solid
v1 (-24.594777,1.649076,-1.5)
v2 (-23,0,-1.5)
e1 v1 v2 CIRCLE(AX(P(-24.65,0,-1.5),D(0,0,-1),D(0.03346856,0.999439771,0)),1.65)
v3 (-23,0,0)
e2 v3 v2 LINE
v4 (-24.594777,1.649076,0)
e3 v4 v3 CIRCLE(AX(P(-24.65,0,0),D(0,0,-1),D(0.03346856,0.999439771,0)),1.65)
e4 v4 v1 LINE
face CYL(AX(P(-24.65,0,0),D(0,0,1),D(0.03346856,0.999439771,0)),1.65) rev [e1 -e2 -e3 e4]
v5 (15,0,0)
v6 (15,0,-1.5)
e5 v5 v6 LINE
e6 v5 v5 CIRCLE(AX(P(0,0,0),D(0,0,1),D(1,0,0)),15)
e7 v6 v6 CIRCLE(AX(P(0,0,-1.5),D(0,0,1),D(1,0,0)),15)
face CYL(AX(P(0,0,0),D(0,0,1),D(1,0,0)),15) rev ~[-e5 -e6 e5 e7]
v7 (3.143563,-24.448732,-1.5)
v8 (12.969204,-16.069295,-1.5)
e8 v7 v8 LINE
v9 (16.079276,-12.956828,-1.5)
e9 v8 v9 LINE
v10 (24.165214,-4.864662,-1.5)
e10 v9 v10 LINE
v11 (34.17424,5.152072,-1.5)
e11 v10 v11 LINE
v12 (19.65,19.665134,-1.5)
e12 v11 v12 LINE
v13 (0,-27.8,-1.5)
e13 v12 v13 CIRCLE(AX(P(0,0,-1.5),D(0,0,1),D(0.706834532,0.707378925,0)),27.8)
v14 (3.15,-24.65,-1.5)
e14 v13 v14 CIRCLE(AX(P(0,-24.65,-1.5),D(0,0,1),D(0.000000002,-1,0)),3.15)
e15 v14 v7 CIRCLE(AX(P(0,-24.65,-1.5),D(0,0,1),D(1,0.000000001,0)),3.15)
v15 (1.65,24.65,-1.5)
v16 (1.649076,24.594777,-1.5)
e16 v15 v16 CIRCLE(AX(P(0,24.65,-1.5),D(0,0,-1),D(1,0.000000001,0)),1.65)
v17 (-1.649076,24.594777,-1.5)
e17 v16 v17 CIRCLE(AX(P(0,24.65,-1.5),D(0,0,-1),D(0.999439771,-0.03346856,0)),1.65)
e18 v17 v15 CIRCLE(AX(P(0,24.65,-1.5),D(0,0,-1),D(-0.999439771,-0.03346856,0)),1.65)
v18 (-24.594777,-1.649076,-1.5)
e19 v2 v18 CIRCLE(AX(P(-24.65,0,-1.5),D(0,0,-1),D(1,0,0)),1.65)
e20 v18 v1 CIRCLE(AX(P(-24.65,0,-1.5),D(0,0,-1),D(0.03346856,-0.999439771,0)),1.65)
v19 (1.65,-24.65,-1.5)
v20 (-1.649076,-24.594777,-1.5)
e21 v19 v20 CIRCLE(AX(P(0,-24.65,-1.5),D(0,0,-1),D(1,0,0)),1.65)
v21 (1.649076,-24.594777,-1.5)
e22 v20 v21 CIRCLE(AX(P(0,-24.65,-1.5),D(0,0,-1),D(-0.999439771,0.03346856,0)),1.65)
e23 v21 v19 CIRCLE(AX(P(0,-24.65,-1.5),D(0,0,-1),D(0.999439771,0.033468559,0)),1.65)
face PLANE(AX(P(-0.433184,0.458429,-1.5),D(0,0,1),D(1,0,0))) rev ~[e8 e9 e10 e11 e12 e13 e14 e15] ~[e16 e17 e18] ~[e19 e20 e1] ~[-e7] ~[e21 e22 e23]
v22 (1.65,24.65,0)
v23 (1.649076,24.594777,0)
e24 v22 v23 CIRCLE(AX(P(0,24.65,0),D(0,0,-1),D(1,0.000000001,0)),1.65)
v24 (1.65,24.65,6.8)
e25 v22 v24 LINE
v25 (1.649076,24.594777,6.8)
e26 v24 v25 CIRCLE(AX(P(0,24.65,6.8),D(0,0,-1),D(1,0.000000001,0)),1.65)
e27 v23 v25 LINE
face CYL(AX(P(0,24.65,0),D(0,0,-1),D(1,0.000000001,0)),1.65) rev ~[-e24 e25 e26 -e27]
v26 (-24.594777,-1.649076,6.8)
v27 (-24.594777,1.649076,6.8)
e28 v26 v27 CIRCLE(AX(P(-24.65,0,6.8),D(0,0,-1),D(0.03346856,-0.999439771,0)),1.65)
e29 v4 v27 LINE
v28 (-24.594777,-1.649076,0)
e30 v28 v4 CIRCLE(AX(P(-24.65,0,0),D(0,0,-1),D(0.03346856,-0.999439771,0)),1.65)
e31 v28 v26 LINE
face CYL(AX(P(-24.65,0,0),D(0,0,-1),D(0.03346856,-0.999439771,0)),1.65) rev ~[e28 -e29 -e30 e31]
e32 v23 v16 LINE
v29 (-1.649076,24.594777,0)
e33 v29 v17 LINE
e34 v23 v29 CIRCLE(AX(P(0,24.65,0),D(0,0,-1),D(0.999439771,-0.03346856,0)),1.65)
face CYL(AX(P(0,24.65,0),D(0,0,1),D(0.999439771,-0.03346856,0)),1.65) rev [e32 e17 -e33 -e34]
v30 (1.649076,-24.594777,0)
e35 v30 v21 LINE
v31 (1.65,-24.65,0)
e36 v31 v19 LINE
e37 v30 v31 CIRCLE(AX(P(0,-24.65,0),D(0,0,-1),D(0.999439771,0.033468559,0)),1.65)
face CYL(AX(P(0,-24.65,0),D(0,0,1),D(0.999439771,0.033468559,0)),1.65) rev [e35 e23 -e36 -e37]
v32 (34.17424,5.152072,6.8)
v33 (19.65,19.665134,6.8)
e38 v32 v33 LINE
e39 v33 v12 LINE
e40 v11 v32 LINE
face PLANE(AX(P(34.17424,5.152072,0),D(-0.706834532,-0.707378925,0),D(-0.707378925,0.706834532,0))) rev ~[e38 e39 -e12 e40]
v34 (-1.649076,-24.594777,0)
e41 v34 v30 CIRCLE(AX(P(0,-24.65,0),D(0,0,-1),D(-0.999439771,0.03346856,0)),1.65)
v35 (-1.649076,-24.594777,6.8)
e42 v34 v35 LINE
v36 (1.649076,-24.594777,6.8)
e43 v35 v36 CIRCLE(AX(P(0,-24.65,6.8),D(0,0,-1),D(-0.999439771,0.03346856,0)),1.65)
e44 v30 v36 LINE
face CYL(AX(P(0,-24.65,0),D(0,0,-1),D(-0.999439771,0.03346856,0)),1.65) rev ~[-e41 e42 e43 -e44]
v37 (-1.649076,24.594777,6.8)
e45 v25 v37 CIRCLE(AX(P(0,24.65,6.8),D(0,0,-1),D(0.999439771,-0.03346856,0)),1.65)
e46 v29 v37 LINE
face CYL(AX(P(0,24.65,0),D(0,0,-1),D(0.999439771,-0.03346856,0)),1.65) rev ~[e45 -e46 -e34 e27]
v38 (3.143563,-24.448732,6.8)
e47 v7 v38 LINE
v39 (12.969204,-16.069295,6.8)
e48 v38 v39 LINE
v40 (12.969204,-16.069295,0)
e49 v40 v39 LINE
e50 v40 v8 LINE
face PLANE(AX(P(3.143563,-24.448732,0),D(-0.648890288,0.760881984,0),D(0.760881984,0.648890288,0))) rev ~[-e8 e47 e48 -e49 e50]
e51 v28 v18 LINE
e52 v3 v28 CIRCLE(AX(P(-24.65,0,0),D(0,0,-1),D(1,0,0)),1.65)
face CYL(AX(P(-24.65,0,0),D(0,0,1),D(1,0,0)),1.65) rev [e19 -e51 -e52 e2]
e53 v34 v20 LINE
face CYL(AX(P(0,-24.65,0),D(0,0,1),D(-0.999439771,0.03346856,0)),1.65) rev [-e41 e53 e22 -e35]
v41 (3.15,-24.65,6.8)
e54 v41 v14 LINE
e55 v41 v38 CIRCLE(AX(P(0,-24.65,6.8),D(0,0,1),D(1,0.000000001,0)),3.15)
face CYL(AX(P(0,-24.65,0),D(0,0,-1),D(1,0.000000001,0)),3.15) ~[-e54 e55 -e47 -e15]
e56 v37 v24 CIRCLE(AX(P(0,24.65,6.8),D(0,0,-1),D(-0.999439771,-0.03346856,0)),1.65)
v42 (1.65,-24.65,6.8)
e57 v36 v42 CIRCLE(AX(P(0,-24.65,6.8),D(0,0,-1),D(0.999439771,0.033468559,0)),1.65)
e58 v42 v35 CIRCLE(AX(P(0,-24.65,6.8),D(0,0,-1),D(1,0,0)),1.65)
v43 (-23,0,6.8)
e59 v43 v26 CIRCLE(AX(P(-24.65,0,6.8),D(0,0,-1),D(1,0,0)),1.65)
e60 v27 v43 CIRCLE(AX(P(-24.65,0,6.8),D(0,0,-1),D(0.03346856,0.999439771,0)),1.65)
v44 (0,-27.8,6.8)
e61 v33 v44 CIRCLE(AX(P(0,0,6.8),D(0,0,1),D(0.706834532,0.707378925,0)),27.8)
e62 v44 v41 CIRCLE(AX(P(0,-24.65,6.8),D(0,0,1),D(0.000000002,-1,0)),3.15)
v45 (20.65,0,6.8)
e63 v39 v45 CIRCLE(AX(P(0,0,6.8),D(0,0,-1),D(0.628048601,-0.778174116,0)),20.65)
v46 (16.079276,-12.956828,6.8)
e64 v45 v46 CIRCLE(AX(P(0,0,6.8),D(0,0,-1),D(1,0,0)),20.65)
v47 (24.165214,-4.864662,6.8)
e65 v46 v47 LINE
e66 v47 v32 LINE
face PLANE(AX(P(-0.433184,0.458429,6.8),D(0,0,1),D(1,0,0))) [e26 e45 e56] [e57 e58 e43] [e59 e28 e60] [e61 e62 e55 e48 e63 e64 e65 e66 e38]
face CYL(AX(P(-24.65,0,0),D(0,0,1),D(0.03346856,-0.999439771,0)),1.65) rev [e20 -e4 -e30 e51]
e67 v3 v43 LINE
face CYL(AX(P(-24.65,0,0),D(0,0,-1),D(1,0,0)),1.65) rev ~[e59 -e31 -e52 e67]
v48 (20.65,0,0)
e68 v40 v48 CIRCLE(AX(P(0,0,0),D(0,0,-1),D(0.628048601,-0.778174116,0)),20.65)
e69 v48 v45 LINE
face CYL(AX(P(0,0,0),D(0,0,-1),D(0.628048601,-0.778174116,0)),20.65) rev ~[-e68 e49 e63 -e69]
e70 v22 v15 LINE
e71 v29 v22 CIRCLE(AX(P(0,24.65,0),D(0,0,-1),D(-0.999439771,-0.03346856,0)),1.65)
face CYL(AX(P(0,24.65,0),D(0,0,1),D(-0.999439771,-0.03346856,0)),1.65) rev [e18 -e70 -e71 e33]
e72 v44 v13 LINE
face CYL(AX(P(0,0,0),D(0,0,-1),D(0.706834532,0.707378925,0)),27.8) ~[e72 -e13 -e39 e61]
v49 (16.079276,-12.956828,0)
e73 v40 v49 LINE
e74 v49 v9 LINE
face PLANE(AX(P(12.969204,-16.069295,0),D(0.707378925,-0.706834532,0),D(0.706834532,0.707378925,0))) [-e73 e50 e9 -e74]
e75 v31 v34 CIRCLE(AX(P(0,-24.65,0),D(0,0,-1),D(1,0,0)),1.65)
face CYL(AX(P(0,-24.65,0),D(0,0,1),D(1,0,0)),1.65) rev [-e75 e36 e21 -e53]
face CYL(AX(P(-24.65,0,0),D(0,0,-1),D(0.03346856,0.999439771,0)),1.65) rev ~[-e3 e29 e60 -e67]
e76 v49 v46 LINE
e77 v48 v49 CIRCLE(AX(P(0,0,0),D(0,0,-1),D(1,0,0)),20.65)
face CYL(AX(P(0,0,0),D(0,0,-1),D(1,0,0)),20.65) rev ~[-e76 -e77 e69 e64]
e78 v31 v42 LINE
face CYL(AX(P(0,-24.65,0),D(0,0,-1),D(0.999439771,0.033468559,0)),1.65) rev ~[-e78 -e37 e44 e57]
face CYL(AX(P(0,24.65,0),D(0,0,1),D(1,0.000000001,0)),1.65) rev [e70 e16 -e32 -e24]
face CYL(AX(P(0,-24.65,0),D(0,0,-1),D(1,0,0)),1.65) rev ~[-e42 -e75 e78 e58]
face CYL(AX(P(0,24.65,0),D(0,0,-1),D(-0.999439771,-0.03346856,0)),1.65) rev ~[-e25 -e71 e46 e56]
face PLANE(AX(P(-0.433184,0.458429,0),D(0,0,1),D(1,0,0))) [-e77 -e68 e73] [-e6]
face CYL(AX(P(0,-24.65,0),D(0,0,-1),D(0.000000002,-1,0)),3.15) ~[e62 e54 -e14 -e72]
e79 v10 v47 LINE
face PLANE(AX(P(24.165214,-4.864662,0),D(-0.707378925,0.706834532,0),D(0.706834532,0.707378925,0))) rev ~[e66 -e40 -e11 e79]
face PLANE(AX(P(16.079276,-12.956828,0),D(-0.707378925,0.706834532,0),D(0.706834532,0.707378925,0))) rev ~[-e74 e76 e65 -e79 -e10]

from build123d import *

# Parameters (mm, degrees)
F0_R     = 15
F1_DEPTH = 1.5
F2_DEPTH = 6.8


with BuildPart() as f1:
    # F0 (on Top) → F1 (new body)
    with BuildSketch(Plane.XY):
        with BuildLine():
            ThreePointArc((24.1652138662, -4.8646622494), (24.5285040494, -2.4443790825), (24.65, 0))
            ThreePointArc((24.65, 0), (18.0037803541, 16.8370541652), (1.6490756219, 24.5947768763))
            ThreePointArc((1.6490756219, 24.5947768763), (0, 23), (-1.6490756219, 24.5947768763))
            ThreePointArc((-1.6490756219, 24.5947768763), (-17.4301821562, 17.4301821562), (-24.5947768763, 1.6490756219))
            ThreePointArc((-24.5947768763, 1.6490756219), (-23.4639101733, 1.1470357113), (-23, 0))
            ThreePointArc((-23, 0), (-23.4639101733, -1.1470357113), (-24.5947768763, -1.6490756219))
            ThreePointArc((-24.5947768763, -1.6490756219), (-17.9529932576, -16.8911969112), (-3.1435634706, -24.4487322515))
            ThreePointArc((-3.1435634706, -24.4487322515), (0, -21.5), (3.1435634706, -24.4487322515))
            Line((3.1435634706, -24.4487322515), (12.969203616, -16.0692954907))
            ThreePointArc((12.969203616, -16.0692954907), (-18.6311104697, 8.9052918349), (20.65, 0))
            ThreePointArc((20.65, 0), (19.4738226895, -6.8696964896), (16.0792755585, -12.9568282197))
            Line((16.0792755585, -12.9568282197), (24.1652138662, -4.8646622494))
        make_face()
        with BuildLine():
            ThreePointArc((1.6490756219, 24.5947768763), (18.0037803541, 16.8370541652), (24.65, 0))
            ThreePointArc((24.65, 0), (24.5285040494, -2.4443790825), (24.1652138662, -4.8646622494))
            Line((24.1652138662, -4.8646622494), (27.771636901, -1.2554616043))
            ThreePointArc((27.771636901, -1.2554616043), (27.7929083207, -0.6278909749), (27.8, 0))
            ThreePointArc((27.8, 0), (25.6818028962, 10.6435426433), (19.65, 19.6651341211))
            ThreePointArc((19.65, 19.6651341211), (-25.6858981613, 10.6336557988), (7.1e-09, -27.8))
            ThreePointArc((7.1e-09, -27.8), (-2.2974435124, -26.8050529709), (-3.1435634706, -24.4487322515))
            ThreePointArc((-3.1435634706, -24.4487322515), (-17.9529932576, -16.8911969112), (-24.5947768763, -1.6490756219))
            ThreePointArc((-24.5947768763, -1.6490756219), (-26.3, 0), (-24.5947768763, 1.6490756219))
            ThreePointArc((-24.5947768763, 1.6490756219), (-17.4301821562, 17.4301821562), (-1.6490756219, 24.5947768763))
            ThreePointArc((-1.6490756219, 24.5947768763), (-0.0276154299, 26.2997688893), (1.65, 24.65))
            ThreePointArc((1.65, 24.65), (1.6497688893, 24.6223845701), (1.6490756219, 24.5947768763))
        make_face()
        with BuildLine():
            ThreePointArc((3.15, -24.65), (3.1483904564, -24.549314679), (3.1435634706, -24.4487322515))
            ThreePointArc((3.1435634706, -24.4487322515), (2.3974318813, -24.5331371898), (1.6490756219, -24.5947768763))
            ThreePointArc((1.6490756219, -24.5947768763), (1.6497688893, -24.6223845701), (1.65, -24.65))
            ThreePointArc((1.65, -24.65), (-0.0276154299, -26.2997688893), (-1.6490756219, -24.5947768763))
            ThreePointArc((-1.6490756219, -24.5947768763), (-2.3974318813, -24.5331371898), (-3.1435634706, -24.4487322515))
            ThreePointArc((-3.1435634706, -24.4487322515), (-2.2974435124, -26.8050529709), (7.1e-09, -27.8))
            ThreePointArc((7.1e-09, -27.8), (2.2273863633, -26.8773863582), (3.15, -24.65))
        make_face()
        with BuildLine():
            ThreePointArc((1.6490756219, -24.5947768763), (2.3974318813, -24.5331371898), (3.1435634706, -24.4487322515))
            ThreePointArc((3.1435634706, -24.4487322515), (0, -21.5), (-3.1435634706, -24.4487322515))
            ThreePointArc((-3.1435634706, -24.4487322515), (-2.3974318813, -24.5331371898), (-1.6490756219, -24.5947768763))
            ThreePointArc((-1.6490756219, -24.5947768763), (0, -23), (1.6490756219, -24.5947768763))
        make_face()
        with BuildLine():
            Line((12.969203616, -16.0692954907), (16.0792755585, -12.9568282197))
            ThreePointArc((16.0792755585, -12.9568282197), (19.4738226895, -6.8696964896), (20.65, 0))
            ThreePointArc((20.65, 0), (-18.6311104697, 8.9052918349), (12.969203616, -16.0692954907))
        make_face()
        Circle(F0_R, mode=Mode.SUBTRACT)
        with BuildLine():
            ThreePointArc((27.8, 0), (27.7929083207, -0.6278909749), (27.771636901, -1.2554616043))
            Line((27.771636901, -1.2554616043), (34.1742395873, 5.1520722659))
            Line((34.1742395873, 5.1520722659), (19.65, 19.6651341211))
            ThreePointArc((19.65, 19.6651341211), (25.6818028962, 10.6435426433), (27.8, 0))
        make_face()
    extrude(amount=-F1_DEPTH)

    # F0 (on Top) → F2 (join)
    with BuildSketch(Plane.XY):
        with BuildLine():
            ThreePointArc((24.1652138662, -4.8646622494), (24.5285040494, -2.4443790825), (24.65, 0))
            ThreePointArc((24.65, 0), (18.0037803541, 16.8370541652), (1.6490756219, 24.5947768763))
            ThreePointArc((1.6490756219, 24.5947768763), (0, 23), (-1.6490756219, 24.5947768763))
            ThreePointArc((-1.6490756219, 24.5947768763), (-17.4301821562, 17.4301821562), (-24.5947768763, 1.6490756219))
            ThreePointArc((-24.5947768763, 1.6490756219), (-23.4639101733, 1.1470357113), (-23, 0))
            ThreePointArc((-23, 0), (-23.4639101733, -1.1470357113), (-24.5947768763, -1.6490756219))
            ThreePointArc((-24.5947768763, -1.6490756219), (-17.9529932576, -16.8911969112), (-3.1435634706, -24.4487322515))
            ThreePointArc((-3.1435634706, -24.4487322515), (0, -21.5), (3.1435634706, -24.4487322515))
            Line((3.1435634706, -24.4487322515), (12.969203616, -16.0692954907))
            ThreePointArc((12.969203616, -16.0692954907), (-18.6311104697, 8.9052918349), (20.65, 0))
            ThreePointArc((20.65, 0), (19.4738226895, -6.8696964896), (16.0792755585, -12.9568282197))
            Line((16.0792755585, -12.9568282197), (24.1652138662, -4.8646622494))
        make_face()
        with BuildLine():
            ThreePointArc((1.6490756219, 24.5947768763), (18.0037803541, 16.8370541652), (24.65, 0))
            ThreePointArc((24.65, 0), (24.5285040494, -2.4443790825), (24.1652138662, -4.8646622494))
            Line((24.1652138662, -4.8646622494), (27.771636901, -1.2554616043))
            ThreePointArc((27.771636901, -1.2554616043), (27.7929083207, -0.6278909749), (27.8, 0))
            ThreePointArc((27.8, 0), (25.6818028962, 10.6435426433), (19.65, 19.6651341211))
            ThreePointArc((19.65, 19.6651341211), (-25.6858981613, 10.6336557988), (7.1e-09, -27.8))
            ThreePointArc((7.1e-09, -27.8), (-2.2974435124, -26.8050529709), (-3.1435634706, -24.4487322515))
            ThreePointArc((-3.1435634706, -24.4487322515), (-17.9529932576, -16.8911969112), (-24.5947768763, -1.6490756219))
            ThreePointArc((-24.5947768763, -1.6490756219), (-26.3, 0), (-24.5947768763, 1.6490756219))
            ThreePointArc((-24.5947768763, 1.6490756219), (-17.4301821562, 17.4301821562), (-1.6490756219, 24.5947768763))
            ThreePointArc((-1.6490756219, 24.5947768763), (-0.0276154299, 26.2997688893), (1.65, 24.65))
            ThreePointArc((1.65, 24.65), (1.6497688893, 24.6223845701), (1.6490756219, 24.5947768763))
        make_face()
        with BuildLine():
            ThreePointArc((3.15, -24.65), (3.1483904564, -24.549314679), (3.1435634706, -24.4487322515))
            ThreePointArc((3.1435634706, -24.4487322515), (2.3974318813, -24.5331371898), (1.6490756219, -24.5947768763))
            ThreePointArc((1.6490756219, -24.5947768763), (1.6497688893, -24.6223845701), (1.65, -24.65))
            ThreePointArc((1.65, -24.65), (-0.0276154299, -26.2997688893), (-1.6490756219, -24.5947768763))
            ThreePointArc((-1.6490756219, -24.5947768763), (-2.3974318813, -24.5331371898), (-3.1435634706, -24.4487322515))
            ThreePointArc((-3.1435634706, -24.4487322515), (-2.2974435124, -26.8050529709), (7.1e-09, -27.8))
            ThreePointArc((7.1e-09, -27.8), (2.2273863633, -26.8773863582), (3.15, -24.65))
        make_face()
        with BuildLine():
            ThreePointArc((1.6490756219, -24.5947768763), (2.3974318813, -24.5331371898), (3.1435634706, -24.4487322515))
            ThreePointArc((3.1435634706, -24.4487322515), (0, -21.5), (-3.1435634706, -24.4487322515))
            ThreePointArc((-3.1435634706, -24.4487322515), (-2.3974318813, -24.5331371898), (-1.6490756219, -24.5947768763))
            ThreePointArc((-1.6490756219, -24.5947768763), (0, -23), (1.6490756219, -24.5947768763))
        make_face()
        with BuildLine():
            ThreePointArc((27.8, 0), (27.7929083207, -0.6278909749), (27.771636901, -1.2554616043))
            Line((27.771636901, -1.2554616043), (34.1742395873, 5.1520722659))
            Line((34.1742395873, 5.1520722659), (19.65, 19.6651341211))
            ThreePointArc((19.65, 19.6651341211), (25.6818028962, 10.6435426433), (27.8, 0))
        make_face()
    extrude(amount=F2_DEPTH)


solid = f1.part
